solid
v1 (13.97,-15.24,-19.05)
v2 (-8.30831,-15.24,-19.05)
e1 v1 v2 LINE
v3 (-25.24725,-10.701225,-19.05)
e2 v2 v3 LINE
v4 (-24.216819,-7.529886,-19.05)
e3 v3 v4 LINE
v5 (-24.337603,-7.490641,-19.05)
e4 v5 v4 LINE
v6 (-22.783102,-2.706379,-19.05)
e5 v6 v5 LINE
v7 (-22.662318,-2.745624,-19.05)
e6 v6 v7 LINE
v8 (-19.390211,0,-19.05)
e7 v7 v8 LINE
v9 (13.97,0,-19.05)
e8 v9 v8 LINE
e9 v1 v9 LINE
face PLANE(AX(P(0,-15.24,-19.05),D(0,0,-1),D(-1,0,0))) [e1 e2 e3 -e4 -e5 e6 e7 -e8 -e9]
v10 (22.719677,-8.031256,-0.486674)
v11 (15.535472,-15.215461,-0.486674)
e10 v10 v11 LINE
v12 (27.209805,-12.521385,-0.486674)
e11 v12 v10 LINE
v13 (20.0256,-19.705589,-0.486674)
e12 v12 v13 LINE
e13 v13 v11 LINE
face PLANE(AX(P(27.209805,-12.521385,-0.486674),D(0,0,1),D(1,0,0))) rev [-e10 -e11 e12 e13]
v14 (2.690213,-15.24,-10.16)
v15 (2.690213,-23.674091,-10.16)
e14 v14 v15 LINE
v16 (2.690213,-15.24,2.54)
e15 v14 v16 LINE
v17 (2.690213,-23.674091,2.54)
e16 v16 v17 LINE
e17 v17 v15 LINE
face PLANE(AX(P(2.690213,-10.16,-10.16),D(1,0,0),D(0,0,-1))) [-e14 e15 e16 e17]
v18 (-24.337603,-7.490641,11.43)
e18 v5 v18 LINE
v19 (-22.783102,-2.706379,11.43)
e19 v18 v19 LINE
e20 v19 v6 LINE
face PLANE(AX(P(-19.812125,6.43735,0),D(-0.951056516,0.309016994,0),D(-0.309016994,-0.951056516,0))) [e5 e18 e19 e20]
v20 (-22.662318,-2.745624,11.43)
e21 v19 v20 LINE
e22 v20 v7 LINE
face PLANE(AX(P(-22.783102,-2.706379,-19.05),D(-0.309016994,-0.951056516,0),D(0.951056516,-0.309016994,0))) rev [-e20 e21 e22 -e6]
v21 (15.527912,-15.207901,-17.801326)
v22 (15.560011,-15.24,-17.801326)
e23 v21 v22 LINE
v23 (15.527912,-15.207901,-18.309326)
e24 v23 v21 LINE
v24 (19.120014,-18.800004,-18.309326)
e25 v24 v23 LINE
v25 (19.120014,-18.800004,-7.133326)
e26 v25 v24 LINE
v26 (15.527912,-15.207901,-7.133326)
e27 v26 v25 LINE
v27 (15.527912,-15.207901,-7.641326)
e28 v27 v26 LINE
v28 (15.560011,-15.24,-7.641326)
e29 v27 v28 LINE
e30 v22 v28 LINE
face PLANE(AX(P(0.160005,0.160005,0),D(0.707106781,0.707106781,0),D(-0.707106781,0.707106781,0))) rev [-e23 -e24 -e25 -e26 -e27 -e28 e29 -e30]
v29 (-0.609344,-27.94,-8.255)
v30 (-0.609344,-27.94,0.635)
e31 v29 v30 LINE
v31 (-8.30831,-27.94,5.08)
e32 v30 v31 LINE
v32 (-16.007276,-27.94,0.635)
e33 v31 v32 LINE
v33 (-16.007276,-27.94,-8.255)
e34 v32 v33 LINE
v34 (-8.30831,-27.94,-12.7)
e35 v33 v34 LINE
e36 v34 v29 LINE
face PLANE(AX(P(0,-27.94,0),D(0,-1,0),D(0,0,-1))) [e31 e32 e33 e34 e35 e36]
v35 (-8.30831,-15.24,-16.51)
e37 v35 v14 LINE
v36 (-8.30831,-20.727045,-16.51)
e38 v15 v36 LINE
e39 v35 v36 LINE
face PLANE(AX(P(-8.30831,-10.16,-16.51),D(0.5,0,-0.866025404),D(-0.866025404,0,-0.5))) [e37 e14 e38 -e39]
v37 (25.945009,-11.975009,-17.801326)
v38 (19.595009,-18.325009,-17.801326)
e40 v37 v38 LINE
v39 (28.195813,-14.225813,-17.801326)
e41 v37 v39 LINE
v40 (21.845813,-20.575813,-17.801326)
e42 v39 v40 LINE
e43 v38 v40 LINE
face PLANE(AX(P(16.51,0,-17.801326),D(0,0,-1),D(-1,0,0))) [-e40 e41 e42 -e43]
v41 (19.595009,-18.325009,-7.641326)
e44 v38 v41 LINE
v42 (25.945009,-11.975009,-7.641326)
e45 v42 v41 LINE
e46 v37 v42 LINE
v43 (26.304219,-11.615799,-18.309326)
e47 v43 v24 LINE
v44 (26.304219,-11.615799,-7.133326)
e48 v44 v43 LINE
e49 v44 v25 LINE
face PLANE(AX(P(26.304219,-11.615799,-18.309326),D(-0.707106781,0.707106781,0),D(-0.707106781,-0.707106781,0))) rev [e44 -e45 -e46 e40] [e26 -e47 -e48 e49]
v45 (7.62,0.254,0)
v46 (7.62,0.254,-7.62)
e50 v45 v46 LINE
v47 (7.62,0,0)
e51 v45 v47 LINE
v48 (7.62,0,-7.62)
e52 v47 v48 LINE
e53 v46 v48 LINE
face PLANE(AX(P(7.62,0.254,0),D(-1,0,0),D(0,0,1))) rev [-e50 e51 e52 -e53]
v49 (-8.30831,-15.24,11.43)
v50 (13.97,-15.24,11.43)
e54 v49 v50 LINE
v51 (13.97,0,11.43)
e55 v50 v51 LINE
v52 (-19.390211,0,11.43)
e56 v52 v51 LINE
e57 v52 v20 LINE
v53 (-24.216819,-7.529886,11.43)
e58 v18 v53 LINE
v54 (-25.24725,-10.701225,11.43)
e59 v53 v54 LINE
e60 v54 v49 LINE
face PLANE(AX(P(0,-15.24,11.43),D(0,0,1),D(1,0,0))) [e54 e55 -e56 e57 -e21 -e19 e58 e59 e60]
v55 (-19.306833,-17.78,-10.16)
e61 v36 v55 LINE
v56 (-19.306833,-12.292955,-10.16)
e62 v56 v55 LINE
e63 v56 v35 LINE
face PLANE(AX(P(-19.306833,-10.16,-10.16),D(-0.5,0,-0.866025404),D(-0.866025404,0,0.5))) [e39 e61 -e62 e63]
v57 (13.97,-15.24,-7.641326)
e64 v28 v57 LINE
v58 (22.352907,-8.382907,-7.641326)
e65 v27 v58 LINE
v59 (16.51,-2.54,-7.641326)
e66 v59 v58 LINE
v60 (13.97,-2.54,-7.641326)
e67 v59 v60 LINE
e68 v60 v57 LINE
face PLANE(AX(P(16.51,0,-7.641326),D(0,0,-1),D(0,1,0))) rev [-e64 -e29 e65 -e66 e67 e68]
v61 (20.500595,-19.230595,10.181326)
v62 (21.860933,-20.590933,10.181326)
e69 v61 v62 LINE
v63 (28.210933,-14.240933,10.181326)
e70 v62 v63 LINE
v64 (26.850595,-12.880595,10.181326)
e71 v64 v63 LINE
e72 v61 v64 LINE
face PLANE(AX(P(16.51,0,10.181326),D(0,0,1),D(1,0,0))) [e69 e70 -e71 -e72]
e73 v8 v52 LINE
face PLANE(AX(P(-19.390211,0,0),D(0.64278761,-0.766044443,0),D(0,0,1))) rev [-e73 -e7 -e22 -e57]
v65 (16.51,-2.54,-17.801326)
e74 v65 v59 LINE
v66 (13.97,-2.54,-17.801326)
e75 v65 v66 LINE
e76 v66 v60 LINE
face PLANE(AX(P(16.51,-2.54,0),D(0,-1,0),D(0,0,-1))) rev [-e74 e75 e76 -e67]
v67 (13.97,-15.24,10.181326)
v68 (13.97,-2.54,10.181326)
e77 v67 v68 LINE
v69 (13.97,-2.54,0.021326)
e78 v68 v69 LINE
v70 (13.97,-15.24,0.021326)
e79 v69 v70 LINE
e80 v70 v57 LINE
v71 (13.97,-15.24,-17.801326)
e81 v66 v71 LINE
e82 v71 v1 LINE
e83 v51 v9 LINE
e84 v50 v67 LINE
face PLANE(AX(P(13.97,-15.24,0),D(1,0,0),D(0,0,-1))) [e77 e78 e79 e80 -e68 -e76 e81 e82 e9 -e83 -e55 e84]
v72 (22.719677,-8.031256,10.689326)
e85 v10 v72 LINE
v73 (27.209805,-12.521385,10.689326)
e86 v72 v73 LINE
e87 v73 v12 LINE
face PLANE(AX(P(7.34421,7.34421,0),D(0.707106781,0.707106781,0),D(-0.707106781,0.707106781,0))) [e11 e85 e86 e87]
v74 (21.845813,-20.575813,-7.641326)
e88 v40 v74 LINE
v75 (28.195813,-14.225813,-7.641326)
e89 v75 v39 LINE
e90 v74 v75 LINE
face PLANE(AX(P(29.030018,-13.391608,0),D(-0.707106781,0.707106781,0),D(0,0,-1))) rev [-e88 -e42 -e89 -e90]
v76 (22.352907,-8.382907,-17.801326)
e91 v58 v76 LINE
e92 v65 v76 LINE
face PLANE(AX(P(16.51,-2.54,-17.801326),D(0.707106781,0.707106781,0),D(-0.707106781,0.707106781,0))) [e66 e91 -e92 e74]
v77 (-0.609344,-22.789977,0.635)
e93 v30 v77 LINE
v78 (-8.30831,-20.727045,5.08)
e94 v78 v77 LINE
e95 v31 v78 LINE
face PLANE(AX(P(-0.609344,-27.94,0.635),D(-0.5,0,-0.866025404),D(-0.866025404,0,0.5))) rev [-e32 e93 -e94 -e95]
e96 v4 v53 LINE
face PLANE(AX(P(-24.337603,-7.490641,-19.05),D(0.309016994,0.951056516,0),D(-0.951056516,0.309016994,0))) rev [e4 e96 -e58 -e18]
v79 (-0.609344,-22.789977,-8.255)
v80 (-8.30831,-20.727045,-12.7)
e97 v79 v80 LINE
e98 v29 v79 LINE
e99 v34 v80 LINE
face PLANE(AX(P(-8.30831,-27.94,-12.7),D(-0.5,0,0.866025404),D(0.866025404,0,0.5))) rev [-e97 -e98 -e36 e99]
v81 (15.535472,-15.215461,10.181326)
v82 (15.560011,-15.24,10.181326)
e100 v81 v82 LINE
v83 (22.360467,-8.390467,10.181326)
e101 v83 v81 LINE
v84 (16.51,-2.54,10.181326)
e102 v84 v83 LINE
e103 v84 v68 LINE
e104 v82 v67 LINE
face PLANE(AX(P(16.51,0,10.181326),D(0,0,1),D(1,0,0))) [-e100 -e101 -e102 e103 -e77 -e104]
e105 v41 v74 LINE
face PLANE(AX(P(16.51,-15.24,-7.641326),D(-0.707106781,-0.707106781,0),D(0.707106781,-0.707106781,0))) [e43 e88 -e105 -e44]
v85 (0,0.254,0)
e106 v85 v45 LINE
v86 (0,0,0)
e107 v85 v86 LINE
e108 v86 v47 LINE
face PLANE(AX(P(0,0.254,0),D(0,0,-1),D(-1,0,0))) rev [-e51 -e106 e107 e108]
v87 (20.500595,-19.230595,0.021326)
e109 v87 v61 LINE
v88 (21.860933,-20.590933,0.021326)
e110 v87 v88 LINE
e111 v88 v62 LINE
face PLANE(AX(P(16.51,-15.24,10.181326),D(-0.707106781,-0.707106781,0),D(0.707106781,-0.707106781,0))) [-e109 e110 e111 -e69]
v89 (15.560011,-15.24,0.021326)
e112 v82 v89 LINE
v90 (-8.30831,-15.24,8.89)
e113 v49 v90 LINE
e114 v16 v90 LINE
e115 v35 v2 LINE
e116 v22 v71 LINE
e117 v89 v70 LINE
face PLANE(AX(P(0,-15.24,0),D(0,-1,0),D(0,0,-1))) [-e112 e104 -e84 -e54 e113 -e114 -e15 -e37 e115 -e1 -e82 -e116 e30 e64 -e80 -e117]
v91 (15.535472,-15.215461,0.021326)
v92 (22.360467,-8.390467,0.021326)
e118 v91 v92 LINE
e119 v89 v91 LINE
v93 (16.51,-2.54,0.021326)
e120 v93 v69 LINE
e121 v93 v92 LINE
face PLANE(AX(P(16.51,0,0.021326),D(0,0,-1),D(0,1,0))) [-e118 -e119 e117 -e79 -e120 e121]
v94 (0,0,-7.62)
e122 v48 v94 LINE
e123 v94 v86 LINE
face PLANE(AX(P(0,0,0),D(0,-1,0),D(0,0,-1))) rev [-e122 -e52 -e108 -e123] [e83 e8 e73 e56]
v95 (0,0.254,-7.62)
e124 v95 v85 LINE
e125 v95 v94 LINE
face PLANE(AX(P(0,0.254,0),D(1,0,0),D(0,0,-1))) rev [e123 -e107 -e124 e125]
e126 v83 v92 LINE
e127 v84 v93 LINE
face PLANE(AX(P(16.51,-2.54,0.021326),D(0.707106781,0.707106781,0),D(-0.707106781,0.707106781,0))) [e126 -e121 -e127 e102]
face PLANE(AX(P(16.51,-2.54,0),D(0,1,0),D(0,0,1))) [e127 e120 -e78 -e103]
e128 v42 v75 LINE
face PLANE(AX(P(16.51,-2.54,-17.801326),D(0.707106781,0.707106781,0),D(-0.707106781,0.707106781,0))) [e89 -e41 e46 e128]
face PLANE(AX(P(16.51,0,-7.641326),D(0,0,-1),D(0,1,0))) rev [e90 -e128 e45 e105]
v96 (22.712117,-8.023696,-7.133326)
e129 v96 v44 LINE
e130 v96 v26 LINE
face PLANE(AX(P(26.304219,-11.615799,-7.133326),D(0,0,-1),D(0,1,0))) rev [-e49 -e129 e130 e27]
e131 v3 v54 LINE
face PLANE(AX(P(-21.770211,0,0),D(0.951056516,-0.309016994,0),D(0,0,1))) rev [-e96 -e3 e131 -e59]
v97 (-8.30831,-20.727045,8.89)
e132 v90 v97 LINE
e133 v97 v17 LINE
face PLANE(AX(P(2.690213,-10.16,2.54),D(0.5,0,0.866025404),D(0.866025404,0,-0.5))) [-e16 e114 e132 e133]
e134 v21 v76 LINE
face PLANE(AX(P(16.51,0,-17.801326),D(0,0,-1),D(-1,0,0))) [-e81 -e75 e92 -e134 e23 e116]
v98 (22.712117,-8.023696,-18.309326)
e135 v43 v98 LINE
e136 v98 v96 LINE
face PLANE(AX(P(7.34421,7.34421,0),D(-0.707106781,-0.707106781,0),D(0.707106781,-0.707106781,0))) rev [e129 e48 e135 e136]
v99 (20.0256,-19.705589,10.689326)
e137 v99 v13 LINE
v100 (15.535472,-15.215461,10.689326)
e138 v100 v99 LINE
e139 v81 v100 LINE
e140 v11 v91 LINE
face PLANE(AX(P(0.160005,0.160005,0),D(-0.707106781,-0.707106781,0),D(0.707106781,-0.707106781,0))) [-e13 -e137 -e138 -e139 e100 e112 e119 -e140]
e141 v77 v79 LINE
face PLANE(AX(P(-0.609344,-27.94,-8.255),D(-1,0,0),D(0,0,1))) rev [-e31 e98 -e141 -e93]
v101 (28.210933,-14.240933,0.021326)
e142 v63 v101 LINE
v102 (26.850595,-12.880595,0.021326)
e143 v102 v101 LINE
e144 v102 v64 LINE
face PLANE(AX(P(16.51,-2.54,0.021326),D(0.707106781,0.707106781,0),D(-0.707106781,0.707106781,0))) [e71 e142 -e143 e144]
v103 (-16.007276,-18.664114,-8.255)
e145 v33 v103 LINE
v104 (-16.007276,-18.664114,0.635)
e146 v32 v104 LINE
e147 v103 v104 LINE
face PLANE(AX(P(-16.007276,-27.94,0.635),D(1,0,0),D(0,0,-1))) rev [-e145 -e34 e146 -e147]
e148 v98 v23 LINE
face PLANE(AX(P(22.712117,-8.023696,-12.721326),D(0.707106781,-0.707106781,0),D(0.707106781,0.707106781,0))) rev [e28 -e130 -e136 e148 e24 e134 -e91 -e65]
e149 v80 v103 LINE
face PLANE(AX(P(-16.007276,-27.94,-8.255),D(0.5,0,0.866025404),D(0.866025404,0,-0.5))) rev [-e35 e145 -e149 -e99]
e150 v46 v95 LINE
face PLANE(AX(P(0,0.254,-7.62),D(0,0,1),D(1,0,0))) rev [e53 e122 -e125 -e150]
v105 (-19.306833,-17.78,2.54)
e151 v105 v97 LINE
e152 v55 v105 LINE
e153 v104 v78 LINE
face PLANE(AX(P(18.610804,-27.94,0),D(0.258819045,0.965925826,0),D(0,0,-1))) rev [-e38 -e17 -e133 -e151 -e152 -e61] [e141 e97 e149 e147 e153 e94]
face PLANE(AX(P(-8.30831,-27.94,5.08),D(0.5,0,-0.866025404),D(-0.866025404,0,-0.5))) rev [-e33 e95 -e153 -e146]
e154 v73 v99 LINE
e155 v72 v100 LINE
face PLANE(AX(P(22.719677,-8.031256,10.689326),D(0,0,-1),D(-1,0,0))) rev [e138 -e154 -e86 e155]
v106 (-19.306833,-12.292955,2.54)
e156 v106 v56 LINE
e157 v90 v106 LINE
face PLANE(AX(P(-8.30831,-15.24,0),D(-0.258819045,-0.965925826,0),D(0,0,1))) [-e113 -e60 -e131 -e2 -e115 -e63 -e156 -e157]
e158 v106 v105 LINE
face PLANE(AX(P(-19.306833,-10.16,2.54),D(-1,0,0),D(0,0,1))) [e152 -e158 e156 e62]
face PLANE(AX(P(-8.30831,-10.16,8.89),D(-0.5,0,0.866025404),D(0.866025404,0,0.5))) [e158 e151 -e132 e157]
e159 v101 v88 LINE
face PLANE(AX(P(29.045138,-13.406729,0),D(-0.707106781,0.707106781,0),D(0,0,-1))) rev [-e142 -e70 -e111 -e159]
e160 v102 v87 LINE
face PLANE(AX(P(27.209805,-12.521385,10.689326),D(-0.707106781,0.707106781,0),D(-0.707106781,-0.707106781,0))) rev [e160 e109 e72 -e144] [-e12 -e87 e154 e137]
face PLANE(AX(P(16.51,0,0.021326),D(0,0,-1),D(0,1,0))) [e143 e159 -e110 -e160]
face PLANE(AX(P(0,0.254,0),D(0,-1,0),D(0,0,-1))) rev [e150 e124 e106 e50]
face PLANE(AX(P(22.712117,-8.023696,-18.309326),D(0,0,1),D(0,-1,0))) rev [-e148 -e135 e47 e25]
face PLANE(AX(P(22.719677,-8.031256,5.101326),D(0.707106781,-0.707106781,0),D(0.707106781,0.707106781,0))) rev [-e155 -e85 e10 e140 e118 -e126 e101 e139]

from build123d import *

# Parameters (mm, degrees)
SKETCH1_W                 = 7.62
SKETCH1_H                 = 7.62
BOSS_EXTRUDE1_DEPTH       = 0.254
SKETCH2_W                 = 7.62
SKETCH2_H                 = 7.62
BOSS_EXTRUDE2_DEPTH       = 15.24
CHAMFER1_SIZE             = 7.62
CHAMFER1_SIZE2            = 4.399409051
CHAMFER2_SIZE             = 3.81
CHAMFER2_SIZE2            = 7.16045777
BOSS_EXTRUDE5_DEPTH       = 12.7
SKETCH7_W                 = 10.16
SKETCH7_H                 = 12.7
BOSS_EXTRUDE7_DEPTH       = 2.54
SWEEP1_START              = 0.02132645
SWEEP1_DEPTH              = 10.16
SWEEP2_START              = -17.80132645
SWEEP2_DEPTH              = 10.16
BOSS_EXTRUDE9_DEPTH       = 0.508
SKETCH12_W                = 11.176
SKETCH12_H                = 5.08
BOSS_EXTRUDE11_DEPTH      = 10.16
BOSS_EXTRUDE12_DEPTH      = 0.508
SKETCH14_W                = 11.176
SKETCH14_H                = 6.35
BOSS_EXTRUDE13_DEPTH      = 10.16
SKETCH17_W                = 30.48
SKETCH17_H                = 15.24
BOSS_EXTRUDE16_DEPTH      = 40.64
CHAMFER10_SIZE            = 15.08
CHAMFER10_SIZE2           = 4.899789019
CHAMFER11_SIZE            = 4.92
CHAMFER11_SIZE_2          = 18.361689973
CHAMFER12_SIZE            = 2.38
CHAMFER12_SIZE2           = 2.886919979
CUT_EXTRUDE1_DEPTH        = 12.7
BOSS_EXTRUDE17_DEPTH      = 12.7
BOSS_EXTRUDE17_DEPTH_BACK = 5.08
CHAMFER14_SIZE            = 10.16
CHAMFER14_SIZE_2          = 37.917636205
BOSS_EXTRUDE18_DEPTH      = 12.7
SKETCH22_W                = 30.48
SKETCH22_H                = 5.030470453
BOSS_EXTRUDE19_DEPTH      = 0.127


# Read off the part's stored shape, not the designer's step: Sweep1, Sweep2
with BuildPart() as part:
    # Sketch1 → Boss-Extrude1 (new body)
    with BuildSketch(Plane(origin=(0, 0, 0), x_dir=(1, 0, 0), z_dir=(0, 1, 0))):
        with Locations((3.81, 3.81)):
            Rectangle(SKETCH1_W, SKETCH1_H)
    extrude(amount=BOSS_EXTRUDE1_DEPTH)

    # Sketch2 → Boss-Extrude2 (add)
    with BuildSketch(Plane.XZ):
        Polygon((7.62, -7.62), (3.81, -7.62), (3.81, -19.05), (13.97, -19.05), (13.97, 11.43), (3.81, 11.43), (3.81, 0), (7.62, 0), align=None)
        Polygon((3.81, -19.05), (3.81, -7.62), (0, -7.62), (0, 0), (3.81, 0), (3.81, 11.43), (-11.525577389, 11.43), (-11.525577389, -19.05), align=None)
        with Locations((3.81, -3.81)):
            Rectangle(SKETCH2_W, SKETCH2_H)
    extrude(amount=BOSS_EXTRUDE2_DEPTH)

    # Chamfer1
    chamfer1_edges = [part.edges().sort_by_distance(p)[0] for p in [
        (-11.525577389, 0, -3.81),
    ]]
    chamfer1_side = [part.faces().sort_by_distance(p)[0] for p in [
        (1.222211305, 0, -18.652626767),
    ]]
    chamfer(chamfer1_edges, length=CHAMFER1_SIZE, length2=CHAMFER1_SIZE2, reference=chamfer1_side[0])

    # Chamfer2
    chamfer2_edges = [part.edges().sort_by_distance(p)[0] for p in [
        (-11.525577389, -4.399409051, -3.81),
    ]]
    chamfer2_side = [part.faces().sort_by_distance(p)[0] for p in [
        (-7.715577389, -2.199704526, -3.81),
    ]]
    chamfer(chamfer2_edges, length=CHAMFER2_SIZE, length2=CHAMFER2_SIZE2, reference=chamfer2_side[0])

    # Sketch3 → Boss-Extrude5 (add)
    with BuildSketch(Plane.XZ.offset(15.24)):
        Polygon((1.222211305, -13.998435267), (10.045655072, -8.904217634), (10.045655072, 1.284217634), (1.222211305, 6.378435267), (-7.601232461, 1.284217634), (-7.601232461, -8.904217634), align=None)
    extrude(amount=BOSS_EXTRUDE5_DEPTH)

    # Sketch7 → Boss-Extrude7 (add)
    with BuildSketch(Plane(origin=(13.97, 0, 0), x_dir=(0, 0, -1), z_dir=(1, 0, 0))):
        Polygon((-3.81, -7.62), (-0.02132645, -7.62), (-0.02132645, -2.54), (-10.18132645, -2.54), (-10.18132645, -7.62), align=None)
        Polygon((-3.83132645, -15.24), (-3.81, -7.62), (-10.18132645, -7.62), (-10.18132645, -15.24), align=None)
        Polygon((-0.02132645, -15.24), (-0.02132645, -7.62), (-3.81, -7.62), (-3.83132645, -15.24), align=None)
        with Locations((12.72132645, -8.89)):
            Rectangle(SKETCH7_W, SKETCH7_H)
    extrude(amount=BOSS_EXTRUDE7_DEPTH)

    # Sweep1 outline → Sweep1 (add)
    with BuildSketch(Plane.XY.offset(SWEEP1_START)):
        Polygon((16.51, -15.24), (29.045138309, -27.775138309), (29.045138309, -15.075138309), (16.51, -2.54), align=None)
    extrude(amount=SWEEP1_DEPTH)

    # Sweep2 outline → Sweep2 (add)
    with BuildSketch(Plane.XY.offset(SWEEP2_START)):
        Polygon((16.51, -2.54), (16.51, -15.24), (29.030018127, -27.760018127), (29.030018127, -15.060018127), align=None)
    extrude(amount=SWEEP2_DEPTH)

    # Chamfer5
    # the kernel refuses this chamfer: 14.368409794, 10.16 mm, written as the material it takes off along each edge
    with BuildSketch(Plane(origin=(29.045138309, -27.775138309, 0.02132645), x_dir=(-0.7459142715976749, 0.6660419652145878, 0), z_dir=(0, 0, 1)), Plane(origin=(29.030018127, -27.760018127, -17.80132645), x_dir=(-0.7459142715976752, 0.6660419652145875, 0), z_dir=(0, 0, 1))) as chamfer5_piece_1:
        with BuildLine():
            Line((10.176243016, 0), (9.537503791, -11.29142094))
            Line((9.537503791, -11.29142094), (9.323151752, -11.482820218))
            ThreePointArc((9.323151752, -11.482820218), (4.705969637, -5.701770021), (-0.214352039, -0.191399278))
            Line((-0.214352039, -0.191399278), (0.016230053, 0.286909507))
            ThreePointArc((0.016230053, 0.286909507), (5.088121508, 0), (10.192473069, 0.286909507))
            Line((10.192473069, 0.286909507), (10.176243016, 0))
        make_face()
    extrude(amount=10.16, mode=Mode.SUBTRACT)

    # Sketch10 → Boss-Extrude9 (add)
    with BuildSketch(Plane(origin=(6.985, 6.985, 0), x_dir=(0, 0, -1), z_dir=(0.7071067811865389, 0.7071067811865561, 0))):
        Polygon((12.72132645, -21.73350196), (18.30932645, -21.73350196), (18.30932645, -26.81350196), (7.13332645, -26.81350196), (7.13332645, -21.73350196), align=None)
    extrude(amount=BOSS_EXTRUDE9_DEPTH)

    # Sketch12 → Boss-Extrude11 (add)
    with BuildSketch(Plane(origin=(7.344210245, 7.344210245, 0), x_dir=(0, 0, -1), z_dir=(0.707106781186539, 0.707106781186556, 0))):
        with Locations((12.72132645, -24.27350196)):
            Rectangle(SKETCH12_W, SKETCH12_H)
    extrude(amount=-BOSS_EXTRUDE11_DEPTH)

    # Sketch13 → Boss-Extrude12 (add)
    with BuildSketch(Plane(origin=(6.985, 6.985, 0), x_dir=(0, 0, -1), z_dir=(0.7071067811865389, 0.7071067811865562, 0))):
        Polygon((-5.10132645, -21.744193544), (-10.68932645, -21.744193544), (-10.68932645, -28.094193544), (0.48667355, -28.094193544), (0.48667355, -21.744193544), align=None)
    extrude(amount=BOSS_EXTRUDE12_DEPTH)

    # Sketch14 → Boss-Extrude13 (add)
    with BuildSketch(Plane(origin=(7.344210245, 7.344210245, 0), x_dir=(0, 0, -1), z_dir=(0.7071067811865388, 0.7071067811865562, 0))):
        with Locations((-5.10132645, -24.919193544)):
            Rectangle(SKETCH14_W, SKETCH14_H)
    extrude(amount=-BOSS_EXTRUDE13_DEPTH)

    # Sketch17 → Boss-Extrude16 (add)
    with BuildSketch(Plane(origin=(13.97, 0, 0), x_dir=(0, 0, -1), z_dir=(1, 0, 0))):
        with Locations((3.81, -7.62)):
            Rectangle(SKETCH17_W, SKETCH17_H)
    extrude(amount=-BOSS_EXTRUDE16_DEPTH)

    # Chamfer10
    chamfer10_edges = [part.edges().sort_by_distance(p)[0] for p in [
        (-26.67, 0, -3.81),
    ]]
    chamfer10_side = [part.faces().sort_by_distance(p)[0] for p in [
        (-26.67, -7.62, -3.81),
    ]]
    chamfer(chamfer10_edges, length=CHAMFER10_SIZE, length2=CHAMFER10_SIZE2, reference=chamfer10_side[0])

    # Chamfer11
    # the kernel refuses this chamfer: 18.361689973, 4.92 mm, written as the material it takes off along each edge
    with BuildSketch(Plane(origin=(-26.67, -15.24, -66.730196419), x_dir=(-0.13751244702129126, 0.990500038825954, 0), z_dir=(0, 0, 1))) as chamfer11_piece_1:
        Polygon((CHAMFER11_SIZE * 0.990500038826, -CHAMFER11_SIZE * 0.137512447021), (-CHAMFER11_SIZE_2 * 0.137512447023, -CHAMFER11_SIZE_2 * 0.990500038839), (0, 0), align=None)
    extrude(amount=125.840392838, mode=Mode.SUBTRACT)

    # Chamfer12
    chamfer12_edges = [part.edges().sort_by_distance(p)[0] for p in [
        (-21.770210981, 0, -3.81),
    ]]
    chamfer12_side = [part.faces().sort_by_distance(p)[0] for p in [
        (-4.334202117, 0, -3.81),
    ]]
    chamfer(chamfer12_edges, length=CHAMFER12_SIZE, length2=CHAMFER12_SIZE2, reference=chamfer12_side[0])

    # Sketch19 → Cut-Extrude1 (cut)
    with BuildSketch(Plane.XZ.offset(27.94)):
        Polygon((-7.601232461, 1.284217634), (-7.601232461, -8.904217634), (1.222211305, -13.998435267), (10.045655072, -8.904217634), (10.045655072, 1.284217634), (1.222211305, 6.378435267), align=None)
    extrude(amount=-CUT_EXTRUDE1_DEPTH, mode=Mode.SUBTRACT)

    # Sketch20 → Boss-Extrude17 (add, two sides: drawn at the far end of the back side and taken through both)
    with BuildSketch(Plane(origin=(0, -15.24, 0), x_dir=(-1, 0, 0), z_dir=(0, -1, 0)).offset(-BOSS_EXTRUDE17_DEPTH_BACK)):
        Polygon((8.308310027, -8.89), (19.306832655, -2.54), (19.306832655, 10.16), (8.308310027, 16.51), (-2.690212601, 10.16), (-2.690212601, -2.54), align=None)
    extrude(amount=BOSS_EXTRUDE17_DEPTH + BOSS_EXTRUDE17_DEPTH_BACK)

    # Chamfer14
    # the kernel refuses this chamfer: 37.917636205, 10.16 mm, written as the material it takes off along each edge
    with BuildSketch(Plane(origin=(-19.306832655, -27.94, 101.001543824), x_dir=(-0.13751244702129076, 0.9905000388259542, 0), z_dir=(0, 0, -1))) as chamfer14_piece_1:
        Polygon((CHAMFER14_SIZE * 0.990500038826, CHAMFER14_SIZE * 0.137512447021), (-CHAMFER14_SIZE_2 * 0.137512447021, CHAMFER14_SIZE_2 * 0.990500038823), (0, 0), align=None)
    extrude(amount=209.623087649, mode=Mode.SUBTRACT)

    # Sketch21 → Boss-Extrude18 (add)
    with BuildSketch(Plane(origin=(0, -15.24, 0), x_dir=(-1, 0, 0), z_dir=(0, -1, 0))):
        Polygon((8.308310027, -5.08), (16.007275866, -0.635), (16.007275866, 8.255), (8.308310027, 12.7), (0.609344187, 8.255), (0.609344187, -0.635), align=None)
    extrude(amount=BOSS_EXTRUDE18_DEPTH)

    # Sketch22 → Boss-Extrude19 (add)
    with BuildSketch(Plane(origin=(-19.691340818, 6.398104477, 0), x_dir=(0, 0, 1), z_dir=(-0.9510565162951544, 0.30901699437494484, 0))):
        with Locations((-3.81, -12.129520369)):
            Rectangle(SKETCH22_W, SKETCH22_H)
    extrude(amount=BOSS_EXTRUDE19_DEPTH)


solid = part.part
